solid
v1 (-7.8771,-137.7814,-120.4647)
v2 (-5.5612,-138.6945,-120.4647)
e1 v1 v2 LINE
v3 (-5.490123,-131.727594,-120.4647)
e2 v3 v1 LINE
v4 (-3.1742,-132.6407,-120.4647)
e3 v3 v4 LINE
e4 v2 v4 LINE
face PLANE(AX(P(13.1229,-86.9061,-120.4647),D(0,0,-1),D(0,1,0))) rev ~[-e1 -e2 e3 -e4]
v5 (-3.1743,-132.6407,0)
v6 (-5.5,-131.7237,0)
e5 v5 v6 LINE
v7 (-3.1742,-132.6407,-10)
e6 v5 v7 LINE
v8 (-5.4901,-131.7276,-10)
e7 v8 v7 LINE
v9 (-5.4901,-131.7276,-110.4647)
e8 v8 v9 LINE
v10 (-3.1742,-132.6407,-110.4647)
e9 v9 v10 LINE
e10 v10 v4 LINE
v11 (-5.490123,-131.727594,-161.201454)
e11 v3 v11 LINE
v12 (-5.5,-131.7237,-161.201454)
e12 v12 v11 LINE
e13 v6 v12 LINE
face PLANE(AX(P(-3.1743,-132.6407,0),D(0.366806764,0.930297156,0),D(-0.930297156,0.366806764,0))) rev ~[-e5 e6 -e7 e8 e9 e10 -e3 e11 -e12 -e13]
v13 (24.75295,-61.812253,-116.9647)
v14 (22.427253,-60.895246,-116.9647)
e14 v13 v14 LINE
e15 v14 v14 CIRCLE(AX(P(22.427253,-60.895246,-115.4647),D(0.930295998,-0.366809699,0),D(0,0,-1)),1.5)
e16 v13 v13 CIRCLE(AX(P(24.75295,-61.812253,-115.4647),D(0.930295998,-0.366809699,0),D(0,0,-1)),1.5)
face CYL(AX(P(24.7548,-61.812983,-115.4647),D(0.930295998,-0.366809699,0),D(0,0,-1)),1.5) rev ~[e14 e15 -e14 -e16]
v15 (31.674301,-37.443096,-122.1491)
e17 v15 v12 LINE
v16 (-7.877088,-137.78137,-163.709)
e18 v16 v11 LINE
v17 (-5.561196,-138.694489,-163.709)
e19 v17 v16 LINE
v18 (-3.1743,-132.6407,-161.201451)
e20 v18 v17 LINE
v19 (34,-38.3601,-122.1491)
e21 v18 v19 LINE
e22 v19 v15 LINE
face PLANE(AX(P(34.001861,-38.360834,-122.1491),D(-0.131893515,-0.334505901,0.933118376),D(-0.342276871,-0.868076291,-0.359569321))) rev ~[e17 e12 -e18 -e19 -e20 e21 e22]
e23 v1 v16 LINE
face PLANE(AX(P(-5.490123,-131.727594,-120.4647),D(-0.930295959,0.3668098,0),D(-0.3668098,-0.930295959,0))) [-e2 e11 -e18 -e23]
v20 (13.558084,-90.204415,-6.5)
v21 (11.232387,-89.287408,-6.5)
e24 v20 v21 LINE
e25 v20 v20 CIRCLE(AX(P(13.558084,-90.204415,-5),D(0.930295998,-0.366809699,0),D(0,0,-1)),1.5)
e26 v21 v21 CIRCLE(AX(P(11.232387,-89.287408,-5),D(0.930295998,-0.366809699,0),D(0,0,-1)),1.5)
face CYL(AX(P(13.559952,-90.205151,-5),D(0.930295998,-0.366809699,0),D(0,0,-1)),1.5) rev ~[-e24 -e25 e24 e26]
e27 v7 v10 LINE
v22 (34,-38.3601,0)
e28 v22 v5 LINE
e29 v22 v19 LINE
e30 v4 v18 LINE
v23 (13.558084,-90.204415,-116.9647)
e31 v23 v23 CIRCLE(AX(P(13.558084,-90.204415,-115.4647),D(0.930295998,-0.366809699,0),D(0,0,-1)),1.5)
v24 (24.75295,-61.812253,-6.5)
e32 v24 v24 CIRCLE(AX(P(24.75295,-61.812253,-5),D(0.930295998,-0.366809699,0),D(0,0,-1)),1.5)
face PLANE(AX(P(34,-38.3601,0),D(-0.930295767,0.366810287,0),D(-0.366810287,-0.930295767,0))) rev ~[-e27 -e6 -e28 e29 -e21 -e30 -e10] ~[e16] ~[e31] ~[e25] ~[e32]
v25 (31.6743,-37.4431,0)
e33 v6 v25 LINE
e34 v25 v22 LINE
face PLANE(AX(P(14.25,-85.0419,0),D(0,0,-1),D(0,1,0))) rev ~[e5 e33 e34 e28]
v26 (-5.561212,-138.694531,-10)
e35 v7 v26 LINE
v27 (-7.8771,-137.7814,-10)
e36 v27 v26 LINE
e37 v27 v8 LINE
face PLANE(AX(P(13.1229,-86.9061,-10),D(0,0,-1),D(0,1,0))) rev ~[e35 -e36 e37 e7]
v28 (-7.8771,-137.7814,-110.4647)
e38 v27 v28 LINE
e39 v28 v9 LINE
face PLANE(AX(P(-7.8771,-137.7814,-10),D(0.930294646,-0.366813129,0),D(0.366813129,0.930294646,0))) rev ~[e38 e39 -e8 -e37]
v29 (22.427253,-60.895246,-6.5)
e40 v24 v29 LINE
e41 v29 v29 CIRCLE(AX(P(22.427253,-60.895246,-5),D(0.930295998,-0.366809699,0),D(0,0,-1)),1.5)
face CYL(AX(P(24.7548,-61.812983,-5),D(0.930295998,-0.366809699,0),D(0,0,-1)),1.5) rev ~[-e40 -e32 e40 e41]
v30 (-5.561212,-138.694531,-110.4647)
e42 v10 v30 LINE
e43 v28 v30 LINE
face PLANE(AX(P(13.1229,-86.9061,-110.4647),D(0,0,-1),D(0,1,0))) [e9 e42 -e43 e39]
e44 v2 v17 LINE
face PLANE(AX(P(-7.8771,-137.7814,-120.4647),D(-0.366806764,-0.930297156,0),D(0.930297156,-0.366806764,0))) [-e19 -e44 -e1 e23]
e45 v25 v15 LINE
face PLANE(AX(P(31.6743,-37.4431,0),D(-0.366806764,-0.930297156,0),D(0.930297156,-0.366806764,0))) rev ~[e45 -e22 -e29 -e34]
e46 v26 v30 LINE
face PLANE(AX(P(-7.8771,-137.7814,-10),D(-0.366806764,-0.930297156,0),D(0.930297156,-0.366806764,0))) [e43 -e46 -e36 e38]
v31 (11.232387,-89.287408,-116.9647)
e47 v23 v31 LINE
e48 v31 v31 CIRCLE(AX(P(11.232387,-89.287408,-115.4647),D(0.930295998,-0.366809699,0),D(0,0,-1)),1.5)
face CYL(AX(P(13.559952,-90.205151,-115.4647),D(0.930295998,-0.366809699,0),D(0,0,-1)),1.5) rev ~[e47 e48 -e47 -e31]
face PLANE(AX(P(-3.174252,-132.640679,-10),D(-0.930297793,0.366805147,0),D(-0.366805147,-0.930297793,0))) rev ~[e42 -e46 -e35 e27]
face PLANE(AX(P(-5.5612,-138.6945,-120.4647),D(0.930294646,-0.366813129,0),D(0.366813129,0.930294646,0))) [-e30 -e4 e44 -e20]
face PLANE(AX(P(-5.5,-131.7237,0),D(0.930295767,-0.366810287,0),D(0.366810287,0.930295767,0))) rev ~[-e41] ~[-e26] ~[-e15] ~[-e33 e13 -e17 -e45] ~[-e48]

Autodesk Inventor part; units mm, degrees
ref_plane "YZ Plane" through (0, 0, 0) normal (1, 0, 0) x (0, 1, 0)
ref_plane "作業平面1" through (14.25, -85.0419, 0) normal (0, 0, -1) x (0, 1, 0)
sketch "スケッチ1" plane through (14.25, -85.0419, 0) normal (0, 0, -1) x (0, 1, 0)
  line L0 (-46.6818, -19.75) -> (47.5988, 17.4243) projected
  line L1 (47.5988, 17.4243) -> (46.6818, 19.75) projected
  line L2 (46.6818, 19.75) -> (-47.5988, -17.4243) projected
  line L3 (-47.5988, -17.4243) -> (-46.6818, -19.75) projected
  point P0 (85.0419, -14.25)
ref_plane "作業平面2" through (-8.85, -128.1353, -159.8711) normal (0, 0.3826834, -0.9238795) x (0, 0.9238795, 0.3826834)
extrude "押し出し1" add sketch "スケッチ1" along normal up to surface surface through (-8.85, -128.1353, -159.8711) normal (0, 0.3826834, -0.9238795)
sketch "スケッチ2" plane through (-3.1743, -132.6408, 0) normal (0.930296, -0.3668097, 0) x (0, 0, -1)
  line L0 (0, 30.3562) -> (10, 30.3562) projected
  line L1 (0, 91.3953) -> (0, 30.3562) projected
  line L2 (10, 91.3953) -> (0, 91.3953) projected
  line L3 (10, 30.3562) -> (10, 91.3953) projected
  line L4 (110.4647, 30.3562) -> (120.4647, 30.3562) projected
  line L5 (110.4647, 91.3953) -> (110.4647, 30.3562) projected
  line L6 (120.4647, 91.3953) -> (110.4647, 91.3953) projected
  line L7 (120.4647, 30.3562) -> (120.4647, 91.3953) projected
  line L8 (110.4647, 30.3562) -> (120.4647, 30.3562) projected
  line L9 (110.4647, 91.3953) -> (110.4647, 30.3562) projected
  line L10 (120.4647, 91.3953) -> (110.4647, 91.3953) projected
  line L11 (120.4647, 30.3562) -> (120.4647, 91.3953) projected
  line L12 (0, 91.3953) -> (10, 91.3953)
  line L13 (10, 91.3953) -> (10, 60.8757)
  line L14 (10, 60.8757) -> (0, 60.8757)
  line L15 (0, 60.8757) -> (0, 91.3953)
  line L16 (10, 60.8757) -> (0, 60.8757)
  line L17 (0, 60.8757) -> (0, 30.3562)
  line L18 (0, 30.3562) -> (10, 30.3562)
  line L19 (10, 30.3562) -> (10, 60.8757)
  line L20 (110.4647, 91.3953) -> (120.4647, 91.3953)
  line L21 (120.4647, 91.3953) -> (120.4647, 60.8757)
  line L22 (120.4647, 60.8757) -> (110.4647, 60.8757)
  line L23 (110.4647, 60.8757) -> (110.4647, 91.3953)
  line L24 (120.4647, 60.8757) -> (110.4647, 60.8757)
  line L25 (110.4647, 60.8757) -> (110.4647, 30.3562)
  line L26 (110.4647, 30.3562) -> (120.4647, 30.3562)
  line L27 (120.4647, 30.3562) -> (120.4647, 60.8757)
  circle A0 centre (5, 45.616) radius 1.5
  circle A1 centre (5, 76.1355) radius 1.5
  circle A2 centre (115.4647, 76.1355) radius 1.5
  circle A3 centre (115.4647, 45.616) radius 1.5
  circle A4 centre (115.4647, 76.1355) radius 1.5 projected
  circle A5 centre (115.4647, 45.616) radius 1.5 projected
  circle A6 centre (5, 76.1355) radius 1.5 projected
  circle A7 centre (5, 45.616) radius 1.5 projected
  circle A8 centre (115.4647, 76.1355) radius 1.5 projected
  circle A9 centre (115.4647, 45.616) radius 1.5 projected
  point P0 (0, 124.5595)
  dimension "d2" = 3
  dimension "d3" = 3
  dimension "d4" = 3
  dimension "d5" = 3
extrude "押し出し2" cut sketch "スケッチ2" against normal blind 2.5 contours A0 | A1 | A2 | A3
ref_plane "作業平面3" through (13.1229, -86.9061, -10) normal (0, 0, -1) x (0, 1, 0)
sketch "スケッチ3" plane through (13.1229, -86.9061, -10) normal (0, 0, -1) x (0, 1, 0)
  line L0 (-44.8176, -18.6229) -> (-45.7346, -16.2971) projected
  line L1 (-50.8753, -21) -> (-51.7923, -18.6743)
  line L2 (-53.8577, -21) -> (53.8577, -21)
  line L3 (-45.423, -16.1743) -> (-53.8577, -19.5)
  line L4 (-51.7923, -18.6743) -> (-50.8753, -21)
  line L5 (-50.8753, -21) -> (-44.8215, -18.613)
  line L6 (-44.8215, -18.613) -> (-45.7385, -16.2873)
  line L7 (-45.7385, -16.2873) -> (-51.7923, -18.6743)
  point P0 (86.9061, -13.1229)
  point P1 (-51.7884, -18.6841)
ref_plane "作業平面4" through (-7.8771, -140.7638, -110.4647) normal (0, 0, 1) x (1, 0, 0)
extrude "押し出し3" add sketch "スケッチ3" along normal up to surface (100.4647 mm away) contours L5 L1 L3 L0
ref_plane "作業平面5" through (13.1229, -86.9061, -120.4647) normal (0, 0, -1) x (0, 1, 0)
sketch "スケッチ4" plane through (13.1229, -86.9061, -120.4647) normal (0, 0, -1) x (0, 1, 0)
  line L0 (-44.8176, -18.6229) -> (-45.7346, -16.2971) projected
  line L1 (-50.8753, -21) -> (-51.7923, -18.6743)
  line L2 (49.4342, 18.5514) -> (-50.8753, -21)
  line L3 (-51.7923, -18.6743) -> (48.5172, 20.8771)
  line L4 (-45.7346, -16.2971) -> (-44.8176, -18.6229)
  line L5 (-44.8176, -18.6229) -> (-50.8714, -21.0098)
  line L6 (-50.8714, -21.0098) -> (-51.7884, -18.6841)
  line L7 (-51.7884, -18.6841) -> (-45.7346, -16.2971)
  point P0 (86.9061, -13.1229)
  point P1 (-51.7884, -18.6841)
  point P2 (-44.8215, -18.613)
extrude "押し出し4" add sketch "スケッチ4" along normal up to surface contours L2 L1 L7 L0 surface through (14.25, -85.0419, -142.0212) normal (0, 0.3826834, -0.9238795)
sketch "スケッチ7" plane through (34, -38.3601, 0) normal (0.930296, -0.3668097, 0) x (0, 0, -1)
  circle A0 centre (5, -55.7288) radius 1.5 projected
  circle A1 centre (115.4647, -55.7288) radius 1.5 projected
  circle A2 centre (5, -25.2093) radius 1.5 projected
  circle A3 centre (115.4647, -25.2093) radius 1.5 projected
  line L0 (164.2448, -107.8521) -> (122.685, 0) projected
  line L1 (0, 0) -> (122.685, 0) projected
  line L2 (0, 0) -> (0, -101.3448) projected
  line L3 (0, -101.3448) -> (10, -101.3448) projected
  line L4 (10, -101.3448) -> (10, -107.8521) projected
  line L5 (10, -107.8521) -> (110.4647, -107.8521) projected
  line L6 (110.4647, -101.3448) -> (110.4647, -107.8521) projected
  line L7 (110.4647, -101.3448) -> (120.4647, -101.3448) projected
  line L8 (120.4647, -101.3448) -> (120.4647, -107.8521) projected
  line L9 (120.4647, -107.8521) -> (164.2448, -107.8521) projected
  line L10 (122.1491, 0) -> (163.709, -107.8521)
  line L11 (164.2448, -107.8521) -> (122.685, 0) projected
  point P0 (0, 23.2147)
  dimension "d13" = 0.5
extrude "押し出し5" cut sketch "スケッチ7" against normal blind 2.5 contours L9 L10 L1 L0
properties part number "lefft_wall" material "木材 (カエデ材)"
